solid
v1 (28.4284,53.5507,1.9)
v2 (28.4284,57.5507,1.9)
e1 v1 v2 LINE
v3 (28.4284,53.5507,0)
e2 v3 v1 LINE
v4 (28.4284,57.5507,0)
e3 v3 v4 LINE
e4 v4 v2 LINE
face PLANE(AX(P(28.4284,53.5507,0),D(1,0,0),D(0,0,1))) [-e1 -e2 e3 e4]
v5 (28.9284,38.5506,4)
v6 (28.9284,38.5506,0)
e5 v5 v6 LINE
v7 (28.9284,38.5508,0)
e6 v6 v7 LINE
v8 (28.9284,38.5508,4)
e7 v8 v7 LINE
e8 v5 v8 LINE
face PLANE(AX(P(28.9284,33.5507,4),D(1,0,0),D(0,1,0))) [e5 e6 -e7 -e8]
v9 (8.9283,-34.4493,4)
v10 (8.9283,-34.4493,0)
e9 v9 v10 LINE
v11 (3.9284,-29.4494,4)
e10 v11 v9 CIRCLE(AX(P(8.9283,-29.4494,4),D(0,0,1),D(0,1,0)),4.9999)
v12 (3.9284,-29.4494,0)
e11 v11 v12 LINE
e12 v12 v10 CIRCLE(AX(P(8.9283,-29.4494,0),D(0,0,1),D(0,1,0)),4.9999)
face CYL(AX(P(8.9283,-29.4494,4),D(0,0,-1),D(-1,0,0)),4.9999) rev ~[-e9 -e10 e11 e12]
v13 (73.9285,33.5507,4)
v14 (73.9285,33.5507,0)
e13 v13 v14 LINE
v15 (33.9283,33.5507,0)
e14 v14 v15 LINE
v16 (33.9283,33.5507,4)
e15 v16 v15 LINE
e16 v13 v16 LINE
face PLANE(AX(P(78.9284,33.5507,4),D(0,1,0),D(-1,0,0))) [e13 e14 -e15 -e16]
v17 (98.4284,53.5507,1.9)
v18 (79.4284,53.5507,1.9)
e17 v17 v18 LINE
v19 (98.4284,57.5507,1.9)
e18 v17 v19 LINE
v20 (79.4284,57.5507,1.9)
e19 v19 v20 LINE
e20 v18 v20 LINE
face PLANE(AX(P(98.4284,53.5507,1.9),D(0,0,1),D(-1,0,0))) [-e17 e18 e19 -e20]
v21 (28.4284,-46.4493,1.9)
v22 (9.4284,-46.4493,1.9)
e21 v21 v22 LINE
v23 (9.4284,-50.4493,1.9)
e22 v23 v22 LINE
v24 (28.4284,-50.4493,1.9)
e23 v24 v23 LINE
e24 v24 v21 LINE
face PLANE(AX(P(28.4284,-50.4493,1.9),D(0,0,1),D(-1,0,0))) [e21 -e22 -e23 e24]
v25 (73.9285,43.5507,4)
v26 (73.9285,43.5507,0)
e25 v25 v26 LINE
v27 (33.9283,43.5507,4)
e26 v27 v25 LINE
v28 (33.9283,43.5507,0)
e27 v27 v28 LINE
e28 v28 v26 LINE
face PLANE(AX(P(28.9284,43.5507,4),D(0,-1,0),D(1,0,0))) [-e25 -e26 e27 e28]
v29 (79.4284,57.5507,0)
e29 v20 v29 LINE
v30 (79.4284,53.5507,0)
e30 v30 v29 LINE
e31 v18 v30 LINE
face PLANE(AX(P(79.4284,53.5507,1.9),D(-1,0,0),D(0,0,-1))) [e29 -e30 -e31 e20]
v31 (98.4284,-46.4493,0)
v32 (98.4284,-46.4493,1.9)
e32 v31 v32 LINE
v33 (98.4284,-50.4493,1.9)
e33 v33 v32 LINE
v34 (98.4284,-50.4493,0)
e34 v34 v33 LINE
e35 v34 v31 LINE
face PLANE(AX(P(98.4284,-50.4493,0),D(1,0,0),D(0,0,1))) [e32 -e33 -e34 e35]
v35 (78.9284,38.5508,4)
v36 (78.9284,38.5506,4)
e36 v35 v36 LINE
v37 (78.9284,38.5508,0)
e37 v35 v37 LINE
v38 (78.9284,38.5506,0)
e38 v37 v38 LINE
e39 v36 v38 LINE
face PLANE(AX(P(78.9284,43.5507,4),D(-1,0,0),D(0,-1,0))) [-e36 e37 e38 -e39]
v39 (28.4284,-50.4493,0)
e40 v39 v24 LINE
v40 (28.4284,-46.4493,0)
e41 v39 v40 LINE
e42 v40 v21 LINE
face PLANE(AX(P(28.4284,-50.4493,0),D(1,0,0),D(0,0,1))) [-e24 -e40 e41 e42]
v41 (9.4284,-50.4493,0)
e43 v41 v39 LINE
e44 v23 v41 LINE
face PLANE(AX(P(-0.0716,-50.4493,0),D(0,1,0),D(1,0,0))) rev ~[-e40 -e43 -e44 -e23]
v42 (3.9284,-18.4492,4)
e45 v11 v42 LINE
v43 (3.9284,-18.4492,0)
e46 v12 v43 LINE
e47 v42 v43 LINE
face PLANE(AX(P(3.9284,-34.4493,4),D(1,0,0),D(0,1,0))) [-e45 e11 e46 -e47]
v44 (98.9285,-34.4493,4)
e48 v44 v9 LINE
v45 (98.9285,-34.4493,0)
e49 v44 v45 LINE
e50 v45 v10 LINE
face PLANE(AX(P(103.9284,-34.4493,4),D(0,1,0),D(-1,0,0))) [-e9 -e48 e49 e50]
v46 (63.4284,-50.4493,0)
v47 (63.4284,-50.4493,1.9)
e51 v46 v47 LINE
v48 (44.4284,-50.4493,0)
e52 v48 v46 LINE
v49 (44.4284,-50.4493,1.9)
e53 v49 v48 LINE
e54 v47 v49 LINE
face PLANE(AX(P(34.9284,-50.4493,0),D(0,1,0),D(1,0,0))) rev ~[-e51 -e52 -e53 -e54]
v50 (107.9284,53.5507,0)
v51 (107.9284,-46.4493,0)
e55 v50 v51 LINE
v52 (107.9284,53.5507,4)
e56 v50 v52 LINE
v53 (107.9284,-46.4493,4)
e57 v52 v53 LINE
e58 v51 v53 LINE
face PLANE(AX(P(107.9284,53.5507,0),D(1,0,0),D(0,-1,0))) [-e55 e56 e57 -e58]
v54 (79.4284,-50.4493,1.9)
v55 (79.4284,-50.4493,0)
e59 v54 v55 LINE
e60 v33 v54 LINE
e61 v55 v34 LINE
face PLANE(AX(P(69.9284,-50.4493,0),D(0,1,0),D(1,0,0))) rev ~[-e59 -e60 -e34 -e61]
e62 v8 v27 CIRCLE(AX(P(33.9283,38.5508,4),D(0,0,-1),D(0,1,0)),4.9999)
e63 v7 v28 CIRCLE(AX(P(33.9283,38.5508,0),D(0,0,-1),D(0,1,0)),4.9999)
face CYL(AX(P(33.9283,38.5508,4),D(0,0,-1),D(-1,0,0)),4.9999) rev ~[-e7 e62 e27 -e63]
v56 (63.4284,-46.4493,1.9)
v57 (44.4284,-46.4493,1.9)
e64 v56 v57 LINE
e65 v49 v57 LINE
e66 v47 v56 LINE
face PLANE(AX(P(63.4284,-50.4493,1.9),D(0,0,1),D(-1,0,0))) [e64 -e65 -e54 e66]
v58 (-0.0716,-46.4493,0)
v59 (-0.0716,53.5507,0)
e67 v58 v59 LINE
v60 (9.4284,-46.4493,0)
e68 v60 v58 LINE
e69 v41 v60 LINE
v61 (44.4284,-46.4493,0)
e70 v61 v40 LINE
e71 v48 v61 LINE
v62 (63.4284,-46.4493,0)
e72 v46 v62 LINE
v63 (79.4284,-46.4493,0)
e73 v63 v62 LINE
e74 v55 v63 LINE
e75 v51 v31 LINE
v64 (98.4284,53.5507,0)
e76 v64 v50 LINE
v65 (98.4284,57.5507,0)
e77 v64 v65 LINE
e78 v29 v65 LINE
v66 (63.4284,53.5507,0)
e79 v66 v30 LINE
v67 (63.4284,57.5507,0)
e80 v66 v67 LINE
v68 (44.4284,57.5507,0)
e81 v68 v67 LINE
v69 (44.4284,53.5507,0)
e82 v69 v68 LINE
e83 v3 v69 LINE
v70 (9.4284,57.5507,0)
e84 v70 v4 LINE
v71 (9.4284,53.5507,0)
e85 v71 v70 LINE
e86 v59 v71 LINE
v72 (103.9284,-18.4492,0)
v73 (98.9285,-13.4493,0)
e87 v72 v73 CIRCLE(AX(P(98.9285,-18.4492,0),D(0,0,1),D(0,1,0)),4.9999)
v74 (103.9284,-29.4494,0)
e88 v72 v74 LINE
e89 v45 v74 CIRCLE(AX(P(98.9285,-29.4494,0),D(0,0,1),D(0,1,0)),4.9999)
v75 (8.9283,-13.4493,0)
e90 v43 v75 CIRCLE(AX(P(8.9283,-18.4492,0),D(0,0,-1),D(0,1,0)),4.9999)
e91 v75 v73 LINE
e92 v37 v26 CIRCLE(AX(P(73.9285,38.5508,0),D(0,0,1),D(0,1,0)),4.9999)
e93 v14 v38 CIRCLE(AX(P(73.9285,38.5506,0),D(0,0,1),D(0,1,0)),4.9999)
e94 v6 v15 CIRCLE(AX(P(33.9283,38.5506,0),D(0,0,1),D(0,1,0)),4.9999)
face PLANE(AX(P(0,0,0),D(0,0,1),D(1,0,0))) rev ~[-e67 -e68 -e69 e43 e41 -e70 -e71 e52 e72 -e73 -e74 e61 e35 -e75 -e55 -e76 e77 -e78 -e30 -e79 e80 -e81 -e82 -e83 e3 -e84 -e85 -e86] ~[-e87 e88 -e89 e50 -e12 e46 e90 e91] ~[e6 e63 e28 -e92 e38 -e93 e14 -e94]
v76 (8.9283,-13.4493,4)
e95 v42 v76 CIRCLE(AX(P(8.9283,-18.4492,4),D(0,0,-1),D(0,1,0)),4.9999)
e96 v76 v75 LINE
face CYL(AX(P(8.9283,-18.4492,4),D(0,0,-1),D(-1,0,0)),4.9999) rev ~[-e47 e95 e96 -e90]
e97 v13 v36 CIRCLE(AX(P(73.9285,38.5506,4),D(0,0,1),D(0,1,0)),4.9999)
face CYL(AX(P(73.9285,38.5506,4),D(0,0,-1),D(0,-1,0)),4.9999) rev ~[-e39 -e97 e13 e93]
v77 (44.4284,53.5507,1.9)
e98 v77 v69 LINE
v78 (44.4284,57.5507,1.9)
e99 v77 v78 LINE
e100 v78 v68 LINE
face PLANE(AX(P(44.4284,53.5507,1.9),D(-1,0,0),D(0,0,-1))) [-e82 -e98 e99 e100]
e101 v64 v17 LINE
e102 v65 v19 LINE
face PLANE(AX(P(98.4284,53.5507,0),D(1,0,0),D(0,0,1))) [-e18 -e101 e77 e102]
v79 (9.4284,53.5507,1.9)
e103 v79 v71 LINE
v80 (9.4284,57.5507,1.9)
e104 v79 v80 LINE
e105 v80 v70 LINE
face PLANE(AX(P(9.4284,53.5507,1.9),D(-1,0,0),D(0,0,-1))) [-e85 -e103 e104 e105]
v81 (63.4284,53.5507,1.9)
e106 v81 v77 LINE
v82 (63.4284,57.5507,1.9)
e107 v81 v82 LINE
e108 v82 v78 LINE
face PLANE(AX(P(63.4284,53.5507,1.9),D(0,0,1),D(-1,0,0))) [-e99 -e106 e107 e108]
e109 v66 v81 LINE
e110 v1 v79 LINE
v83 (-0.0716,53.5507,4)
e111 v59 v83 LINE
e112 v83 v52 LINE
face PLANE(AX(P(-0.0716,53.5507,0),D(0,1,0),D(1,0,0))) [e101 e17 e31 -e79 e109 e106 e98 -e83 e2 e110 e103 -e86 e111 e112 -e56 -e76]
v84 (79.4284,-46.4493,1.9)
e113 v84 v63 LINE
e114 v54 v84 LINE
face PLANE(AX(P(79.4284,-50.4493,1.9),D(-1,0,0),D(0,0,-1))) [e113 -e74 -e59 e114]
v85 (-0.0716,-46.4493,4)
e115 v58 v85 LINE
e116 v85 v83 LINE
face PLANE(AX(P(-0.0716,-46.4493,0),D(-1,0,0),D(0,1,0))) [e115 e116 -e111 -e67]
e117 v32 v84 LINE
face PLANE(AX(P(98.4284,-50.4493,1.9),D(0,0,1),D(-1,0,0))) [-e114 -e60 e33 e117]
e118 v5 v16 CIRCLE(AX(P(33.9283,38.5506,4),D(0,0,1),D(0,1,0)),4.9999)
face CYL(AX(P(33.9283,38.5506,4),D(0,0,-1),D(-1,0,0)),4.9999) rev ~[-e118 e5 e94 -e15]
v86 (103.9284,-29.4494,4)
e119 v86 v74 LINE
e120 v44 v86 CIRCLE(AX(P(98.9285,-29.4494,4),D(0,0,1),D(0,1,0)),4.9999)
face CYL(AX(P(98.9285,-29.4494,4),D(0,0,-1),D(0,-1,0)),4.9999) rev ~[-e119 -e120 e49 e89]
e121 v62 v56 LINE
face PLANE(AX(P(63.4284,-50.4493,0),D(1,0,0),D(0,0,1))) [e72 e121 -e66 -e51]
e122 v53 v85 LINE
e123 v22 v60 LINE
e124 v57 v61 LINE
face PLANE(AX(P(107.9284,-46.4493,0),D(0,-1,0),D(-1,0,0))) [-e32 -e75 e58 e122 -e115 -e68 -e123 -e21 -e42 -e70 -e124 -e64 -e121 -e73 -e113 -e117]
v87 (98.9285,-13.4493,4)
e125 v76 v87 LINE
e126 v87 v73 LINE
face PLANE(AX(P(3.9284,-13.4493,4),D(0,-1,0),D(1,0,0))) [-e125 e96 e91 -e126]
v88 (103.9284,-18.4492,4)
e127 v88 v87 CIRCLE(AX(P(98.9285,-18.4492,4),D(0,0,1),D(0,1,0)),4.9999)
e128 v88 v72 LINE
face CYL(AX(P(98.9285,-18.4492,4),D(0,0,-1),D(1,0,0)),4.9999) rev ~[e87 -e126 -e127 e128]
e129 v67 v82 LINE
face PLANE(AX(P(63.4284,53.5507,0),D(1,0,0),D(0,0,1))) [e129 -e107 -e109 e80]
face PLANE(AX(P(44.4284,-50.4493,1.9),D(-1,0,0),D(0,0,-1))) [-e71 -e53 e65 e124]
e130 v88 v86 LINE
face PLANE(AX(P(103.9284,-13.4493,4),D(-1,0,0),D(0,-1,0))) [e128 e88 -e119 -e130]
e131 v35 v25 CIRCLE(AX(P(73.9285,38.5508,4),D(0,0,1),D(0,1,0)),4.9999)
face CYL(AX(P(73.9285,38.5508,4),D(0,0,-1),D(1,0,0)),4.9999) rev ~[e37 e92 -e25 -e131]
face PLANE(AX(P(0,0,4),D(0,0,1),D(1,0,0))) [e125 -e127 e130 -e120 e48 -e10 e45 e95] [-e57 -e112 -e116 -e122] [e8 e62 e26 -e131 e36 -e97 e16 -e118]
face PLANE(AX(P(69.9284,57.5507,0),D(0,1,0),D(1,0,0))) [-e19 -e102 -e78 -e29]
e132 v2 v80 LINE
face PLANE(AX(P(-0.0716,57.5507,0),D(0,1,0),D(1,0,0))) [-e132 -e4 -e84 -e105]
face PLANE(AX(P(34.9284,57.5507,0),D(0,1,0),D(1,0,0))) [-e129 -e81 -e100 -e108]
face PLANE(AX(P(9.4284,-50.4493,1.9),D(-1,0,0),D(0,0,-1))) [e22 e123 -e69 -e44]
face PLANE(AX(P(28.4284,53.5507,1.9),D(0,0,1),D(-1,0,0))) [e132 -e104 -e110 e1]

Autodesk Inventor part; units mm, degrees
ref_plane "YZ Plane" through (0, 0, 0) normal (1, 0, 0) x (0, 1, 0)
ref_plane "XZ Plane" through (0, 0, 0) normal (0, 1, 0) x (-1, 0, 0)
ref_plane "XY Plane" through (0, 0, 0) normal (0, 0, 1) x (1, 0, 0)
sketch "Sketch1" plane through (0, 0, 0) normal (0, 0, 1) x (1, 0, 0)
  line L0 (-0.0716, 53.5507) -> (107.9284, 53.5507)
  line L1 (107.9284, 53.5507) -> (107.9284, -46.4493)
  line L2 (107.9284, -46.4493) -> (-0.0716, -46.4493)
  line L3 (-0.0716, -46.4493) -> (-0.0716, 53.5507)
  point P0 (0, 0)
  dimension "d0" = 108
  dimension "d1" = 100
extrude "Extrusion1" add sketch "Sketch1" along normal blind 4
sketch "Sketch2" plane through (-0.0716, 53.5507, 0) normal (0, 1, 0) x (1, 0, 0)
  line L0 (0, 0) -> (108, 0) projected
  line L1 (9.5, 0) -> (28.5, 0)
  line L2 (28.5, 0) -> (28.5, -1.9)
  line L3 (28.5, -1.9) -> (9.5, -1.9)
  line L4 (9.5, -1.9) -> (9.5, 0)
  point P0 (0.0716, 0)
  point P1 (28.5, 0)
  dimension "d4" = 19
  dimension "d5" = 1.9
  dimension "d6" = 9.5
extrude "Extrusion2" add sketch "Sketch2" along normal blind 4
pattern_linear "Rectangular Pattern1" count 3 spacing 35 along (1, 0, 0) count 2 spacing 104 along (0, -1, 0) of "Extrusion2"
sketch "Sketch3" plane through (0, 0, 4) normal (0, 0, 1) x (1, 0, 0)
  line L0 (3.9284, -13.4493) -> (103.9284, -13.4493)
  line L1 (103.9284, -13.4493) -> (103.9284, -34.4493)
  line L2 (103.9284, -34.4493) -> (3.9284, -34.4493)
  line L3 (3.9284, -34.4493) -> (3.9284, -13.4493)
  line L4 (-0.0716, 53.5507) -> (-0.0716, -46.4493) projected
  line L5 (107.9284, 53.5507) -> (-0.0716, 53.5507) projected
  line L6 (28.9284, 43.5507) -> (78.9284, 43.5507)
  line L7 (78.9284, 43.5507) -> (78.9284, 33.5507)
  line L8 (78.9284, 33.5507) -> (28.9284, 33.5507)
  line L9 (28.9284, 33.5507) -> (28.9284, 43.5507)
  point P0 (0, 0)
  point P1 (53.9284, -13.4493)
  point P2 (53.9284, 33.5507)
  dimension "d15" = 100
  dimension "d16" = 21
  dimension "d17" = 4
  dimension "d18" = 67
  dimension "d21" = 50
  dimension "d22" = 10
  dimension "d23" = 0
  dimension "d24" = 10
extrude "Extrusion3" cut sketch "Sketch3" against normal blind 4
fillet "Fillet1" radius 5 8 edges at (3.9284, -34.4493, 2) (3.9284, -13.4493, 2) (103.9284, -13.4493, 2) (103.9284, -34.4493, 2) (78.9284, 33.5507, 2) (28.9284, 33.5507, 2) (28.9284, 43.5507, 2) (78.9284, 43.5507, 2)
properties part number "Enclosure_4"
